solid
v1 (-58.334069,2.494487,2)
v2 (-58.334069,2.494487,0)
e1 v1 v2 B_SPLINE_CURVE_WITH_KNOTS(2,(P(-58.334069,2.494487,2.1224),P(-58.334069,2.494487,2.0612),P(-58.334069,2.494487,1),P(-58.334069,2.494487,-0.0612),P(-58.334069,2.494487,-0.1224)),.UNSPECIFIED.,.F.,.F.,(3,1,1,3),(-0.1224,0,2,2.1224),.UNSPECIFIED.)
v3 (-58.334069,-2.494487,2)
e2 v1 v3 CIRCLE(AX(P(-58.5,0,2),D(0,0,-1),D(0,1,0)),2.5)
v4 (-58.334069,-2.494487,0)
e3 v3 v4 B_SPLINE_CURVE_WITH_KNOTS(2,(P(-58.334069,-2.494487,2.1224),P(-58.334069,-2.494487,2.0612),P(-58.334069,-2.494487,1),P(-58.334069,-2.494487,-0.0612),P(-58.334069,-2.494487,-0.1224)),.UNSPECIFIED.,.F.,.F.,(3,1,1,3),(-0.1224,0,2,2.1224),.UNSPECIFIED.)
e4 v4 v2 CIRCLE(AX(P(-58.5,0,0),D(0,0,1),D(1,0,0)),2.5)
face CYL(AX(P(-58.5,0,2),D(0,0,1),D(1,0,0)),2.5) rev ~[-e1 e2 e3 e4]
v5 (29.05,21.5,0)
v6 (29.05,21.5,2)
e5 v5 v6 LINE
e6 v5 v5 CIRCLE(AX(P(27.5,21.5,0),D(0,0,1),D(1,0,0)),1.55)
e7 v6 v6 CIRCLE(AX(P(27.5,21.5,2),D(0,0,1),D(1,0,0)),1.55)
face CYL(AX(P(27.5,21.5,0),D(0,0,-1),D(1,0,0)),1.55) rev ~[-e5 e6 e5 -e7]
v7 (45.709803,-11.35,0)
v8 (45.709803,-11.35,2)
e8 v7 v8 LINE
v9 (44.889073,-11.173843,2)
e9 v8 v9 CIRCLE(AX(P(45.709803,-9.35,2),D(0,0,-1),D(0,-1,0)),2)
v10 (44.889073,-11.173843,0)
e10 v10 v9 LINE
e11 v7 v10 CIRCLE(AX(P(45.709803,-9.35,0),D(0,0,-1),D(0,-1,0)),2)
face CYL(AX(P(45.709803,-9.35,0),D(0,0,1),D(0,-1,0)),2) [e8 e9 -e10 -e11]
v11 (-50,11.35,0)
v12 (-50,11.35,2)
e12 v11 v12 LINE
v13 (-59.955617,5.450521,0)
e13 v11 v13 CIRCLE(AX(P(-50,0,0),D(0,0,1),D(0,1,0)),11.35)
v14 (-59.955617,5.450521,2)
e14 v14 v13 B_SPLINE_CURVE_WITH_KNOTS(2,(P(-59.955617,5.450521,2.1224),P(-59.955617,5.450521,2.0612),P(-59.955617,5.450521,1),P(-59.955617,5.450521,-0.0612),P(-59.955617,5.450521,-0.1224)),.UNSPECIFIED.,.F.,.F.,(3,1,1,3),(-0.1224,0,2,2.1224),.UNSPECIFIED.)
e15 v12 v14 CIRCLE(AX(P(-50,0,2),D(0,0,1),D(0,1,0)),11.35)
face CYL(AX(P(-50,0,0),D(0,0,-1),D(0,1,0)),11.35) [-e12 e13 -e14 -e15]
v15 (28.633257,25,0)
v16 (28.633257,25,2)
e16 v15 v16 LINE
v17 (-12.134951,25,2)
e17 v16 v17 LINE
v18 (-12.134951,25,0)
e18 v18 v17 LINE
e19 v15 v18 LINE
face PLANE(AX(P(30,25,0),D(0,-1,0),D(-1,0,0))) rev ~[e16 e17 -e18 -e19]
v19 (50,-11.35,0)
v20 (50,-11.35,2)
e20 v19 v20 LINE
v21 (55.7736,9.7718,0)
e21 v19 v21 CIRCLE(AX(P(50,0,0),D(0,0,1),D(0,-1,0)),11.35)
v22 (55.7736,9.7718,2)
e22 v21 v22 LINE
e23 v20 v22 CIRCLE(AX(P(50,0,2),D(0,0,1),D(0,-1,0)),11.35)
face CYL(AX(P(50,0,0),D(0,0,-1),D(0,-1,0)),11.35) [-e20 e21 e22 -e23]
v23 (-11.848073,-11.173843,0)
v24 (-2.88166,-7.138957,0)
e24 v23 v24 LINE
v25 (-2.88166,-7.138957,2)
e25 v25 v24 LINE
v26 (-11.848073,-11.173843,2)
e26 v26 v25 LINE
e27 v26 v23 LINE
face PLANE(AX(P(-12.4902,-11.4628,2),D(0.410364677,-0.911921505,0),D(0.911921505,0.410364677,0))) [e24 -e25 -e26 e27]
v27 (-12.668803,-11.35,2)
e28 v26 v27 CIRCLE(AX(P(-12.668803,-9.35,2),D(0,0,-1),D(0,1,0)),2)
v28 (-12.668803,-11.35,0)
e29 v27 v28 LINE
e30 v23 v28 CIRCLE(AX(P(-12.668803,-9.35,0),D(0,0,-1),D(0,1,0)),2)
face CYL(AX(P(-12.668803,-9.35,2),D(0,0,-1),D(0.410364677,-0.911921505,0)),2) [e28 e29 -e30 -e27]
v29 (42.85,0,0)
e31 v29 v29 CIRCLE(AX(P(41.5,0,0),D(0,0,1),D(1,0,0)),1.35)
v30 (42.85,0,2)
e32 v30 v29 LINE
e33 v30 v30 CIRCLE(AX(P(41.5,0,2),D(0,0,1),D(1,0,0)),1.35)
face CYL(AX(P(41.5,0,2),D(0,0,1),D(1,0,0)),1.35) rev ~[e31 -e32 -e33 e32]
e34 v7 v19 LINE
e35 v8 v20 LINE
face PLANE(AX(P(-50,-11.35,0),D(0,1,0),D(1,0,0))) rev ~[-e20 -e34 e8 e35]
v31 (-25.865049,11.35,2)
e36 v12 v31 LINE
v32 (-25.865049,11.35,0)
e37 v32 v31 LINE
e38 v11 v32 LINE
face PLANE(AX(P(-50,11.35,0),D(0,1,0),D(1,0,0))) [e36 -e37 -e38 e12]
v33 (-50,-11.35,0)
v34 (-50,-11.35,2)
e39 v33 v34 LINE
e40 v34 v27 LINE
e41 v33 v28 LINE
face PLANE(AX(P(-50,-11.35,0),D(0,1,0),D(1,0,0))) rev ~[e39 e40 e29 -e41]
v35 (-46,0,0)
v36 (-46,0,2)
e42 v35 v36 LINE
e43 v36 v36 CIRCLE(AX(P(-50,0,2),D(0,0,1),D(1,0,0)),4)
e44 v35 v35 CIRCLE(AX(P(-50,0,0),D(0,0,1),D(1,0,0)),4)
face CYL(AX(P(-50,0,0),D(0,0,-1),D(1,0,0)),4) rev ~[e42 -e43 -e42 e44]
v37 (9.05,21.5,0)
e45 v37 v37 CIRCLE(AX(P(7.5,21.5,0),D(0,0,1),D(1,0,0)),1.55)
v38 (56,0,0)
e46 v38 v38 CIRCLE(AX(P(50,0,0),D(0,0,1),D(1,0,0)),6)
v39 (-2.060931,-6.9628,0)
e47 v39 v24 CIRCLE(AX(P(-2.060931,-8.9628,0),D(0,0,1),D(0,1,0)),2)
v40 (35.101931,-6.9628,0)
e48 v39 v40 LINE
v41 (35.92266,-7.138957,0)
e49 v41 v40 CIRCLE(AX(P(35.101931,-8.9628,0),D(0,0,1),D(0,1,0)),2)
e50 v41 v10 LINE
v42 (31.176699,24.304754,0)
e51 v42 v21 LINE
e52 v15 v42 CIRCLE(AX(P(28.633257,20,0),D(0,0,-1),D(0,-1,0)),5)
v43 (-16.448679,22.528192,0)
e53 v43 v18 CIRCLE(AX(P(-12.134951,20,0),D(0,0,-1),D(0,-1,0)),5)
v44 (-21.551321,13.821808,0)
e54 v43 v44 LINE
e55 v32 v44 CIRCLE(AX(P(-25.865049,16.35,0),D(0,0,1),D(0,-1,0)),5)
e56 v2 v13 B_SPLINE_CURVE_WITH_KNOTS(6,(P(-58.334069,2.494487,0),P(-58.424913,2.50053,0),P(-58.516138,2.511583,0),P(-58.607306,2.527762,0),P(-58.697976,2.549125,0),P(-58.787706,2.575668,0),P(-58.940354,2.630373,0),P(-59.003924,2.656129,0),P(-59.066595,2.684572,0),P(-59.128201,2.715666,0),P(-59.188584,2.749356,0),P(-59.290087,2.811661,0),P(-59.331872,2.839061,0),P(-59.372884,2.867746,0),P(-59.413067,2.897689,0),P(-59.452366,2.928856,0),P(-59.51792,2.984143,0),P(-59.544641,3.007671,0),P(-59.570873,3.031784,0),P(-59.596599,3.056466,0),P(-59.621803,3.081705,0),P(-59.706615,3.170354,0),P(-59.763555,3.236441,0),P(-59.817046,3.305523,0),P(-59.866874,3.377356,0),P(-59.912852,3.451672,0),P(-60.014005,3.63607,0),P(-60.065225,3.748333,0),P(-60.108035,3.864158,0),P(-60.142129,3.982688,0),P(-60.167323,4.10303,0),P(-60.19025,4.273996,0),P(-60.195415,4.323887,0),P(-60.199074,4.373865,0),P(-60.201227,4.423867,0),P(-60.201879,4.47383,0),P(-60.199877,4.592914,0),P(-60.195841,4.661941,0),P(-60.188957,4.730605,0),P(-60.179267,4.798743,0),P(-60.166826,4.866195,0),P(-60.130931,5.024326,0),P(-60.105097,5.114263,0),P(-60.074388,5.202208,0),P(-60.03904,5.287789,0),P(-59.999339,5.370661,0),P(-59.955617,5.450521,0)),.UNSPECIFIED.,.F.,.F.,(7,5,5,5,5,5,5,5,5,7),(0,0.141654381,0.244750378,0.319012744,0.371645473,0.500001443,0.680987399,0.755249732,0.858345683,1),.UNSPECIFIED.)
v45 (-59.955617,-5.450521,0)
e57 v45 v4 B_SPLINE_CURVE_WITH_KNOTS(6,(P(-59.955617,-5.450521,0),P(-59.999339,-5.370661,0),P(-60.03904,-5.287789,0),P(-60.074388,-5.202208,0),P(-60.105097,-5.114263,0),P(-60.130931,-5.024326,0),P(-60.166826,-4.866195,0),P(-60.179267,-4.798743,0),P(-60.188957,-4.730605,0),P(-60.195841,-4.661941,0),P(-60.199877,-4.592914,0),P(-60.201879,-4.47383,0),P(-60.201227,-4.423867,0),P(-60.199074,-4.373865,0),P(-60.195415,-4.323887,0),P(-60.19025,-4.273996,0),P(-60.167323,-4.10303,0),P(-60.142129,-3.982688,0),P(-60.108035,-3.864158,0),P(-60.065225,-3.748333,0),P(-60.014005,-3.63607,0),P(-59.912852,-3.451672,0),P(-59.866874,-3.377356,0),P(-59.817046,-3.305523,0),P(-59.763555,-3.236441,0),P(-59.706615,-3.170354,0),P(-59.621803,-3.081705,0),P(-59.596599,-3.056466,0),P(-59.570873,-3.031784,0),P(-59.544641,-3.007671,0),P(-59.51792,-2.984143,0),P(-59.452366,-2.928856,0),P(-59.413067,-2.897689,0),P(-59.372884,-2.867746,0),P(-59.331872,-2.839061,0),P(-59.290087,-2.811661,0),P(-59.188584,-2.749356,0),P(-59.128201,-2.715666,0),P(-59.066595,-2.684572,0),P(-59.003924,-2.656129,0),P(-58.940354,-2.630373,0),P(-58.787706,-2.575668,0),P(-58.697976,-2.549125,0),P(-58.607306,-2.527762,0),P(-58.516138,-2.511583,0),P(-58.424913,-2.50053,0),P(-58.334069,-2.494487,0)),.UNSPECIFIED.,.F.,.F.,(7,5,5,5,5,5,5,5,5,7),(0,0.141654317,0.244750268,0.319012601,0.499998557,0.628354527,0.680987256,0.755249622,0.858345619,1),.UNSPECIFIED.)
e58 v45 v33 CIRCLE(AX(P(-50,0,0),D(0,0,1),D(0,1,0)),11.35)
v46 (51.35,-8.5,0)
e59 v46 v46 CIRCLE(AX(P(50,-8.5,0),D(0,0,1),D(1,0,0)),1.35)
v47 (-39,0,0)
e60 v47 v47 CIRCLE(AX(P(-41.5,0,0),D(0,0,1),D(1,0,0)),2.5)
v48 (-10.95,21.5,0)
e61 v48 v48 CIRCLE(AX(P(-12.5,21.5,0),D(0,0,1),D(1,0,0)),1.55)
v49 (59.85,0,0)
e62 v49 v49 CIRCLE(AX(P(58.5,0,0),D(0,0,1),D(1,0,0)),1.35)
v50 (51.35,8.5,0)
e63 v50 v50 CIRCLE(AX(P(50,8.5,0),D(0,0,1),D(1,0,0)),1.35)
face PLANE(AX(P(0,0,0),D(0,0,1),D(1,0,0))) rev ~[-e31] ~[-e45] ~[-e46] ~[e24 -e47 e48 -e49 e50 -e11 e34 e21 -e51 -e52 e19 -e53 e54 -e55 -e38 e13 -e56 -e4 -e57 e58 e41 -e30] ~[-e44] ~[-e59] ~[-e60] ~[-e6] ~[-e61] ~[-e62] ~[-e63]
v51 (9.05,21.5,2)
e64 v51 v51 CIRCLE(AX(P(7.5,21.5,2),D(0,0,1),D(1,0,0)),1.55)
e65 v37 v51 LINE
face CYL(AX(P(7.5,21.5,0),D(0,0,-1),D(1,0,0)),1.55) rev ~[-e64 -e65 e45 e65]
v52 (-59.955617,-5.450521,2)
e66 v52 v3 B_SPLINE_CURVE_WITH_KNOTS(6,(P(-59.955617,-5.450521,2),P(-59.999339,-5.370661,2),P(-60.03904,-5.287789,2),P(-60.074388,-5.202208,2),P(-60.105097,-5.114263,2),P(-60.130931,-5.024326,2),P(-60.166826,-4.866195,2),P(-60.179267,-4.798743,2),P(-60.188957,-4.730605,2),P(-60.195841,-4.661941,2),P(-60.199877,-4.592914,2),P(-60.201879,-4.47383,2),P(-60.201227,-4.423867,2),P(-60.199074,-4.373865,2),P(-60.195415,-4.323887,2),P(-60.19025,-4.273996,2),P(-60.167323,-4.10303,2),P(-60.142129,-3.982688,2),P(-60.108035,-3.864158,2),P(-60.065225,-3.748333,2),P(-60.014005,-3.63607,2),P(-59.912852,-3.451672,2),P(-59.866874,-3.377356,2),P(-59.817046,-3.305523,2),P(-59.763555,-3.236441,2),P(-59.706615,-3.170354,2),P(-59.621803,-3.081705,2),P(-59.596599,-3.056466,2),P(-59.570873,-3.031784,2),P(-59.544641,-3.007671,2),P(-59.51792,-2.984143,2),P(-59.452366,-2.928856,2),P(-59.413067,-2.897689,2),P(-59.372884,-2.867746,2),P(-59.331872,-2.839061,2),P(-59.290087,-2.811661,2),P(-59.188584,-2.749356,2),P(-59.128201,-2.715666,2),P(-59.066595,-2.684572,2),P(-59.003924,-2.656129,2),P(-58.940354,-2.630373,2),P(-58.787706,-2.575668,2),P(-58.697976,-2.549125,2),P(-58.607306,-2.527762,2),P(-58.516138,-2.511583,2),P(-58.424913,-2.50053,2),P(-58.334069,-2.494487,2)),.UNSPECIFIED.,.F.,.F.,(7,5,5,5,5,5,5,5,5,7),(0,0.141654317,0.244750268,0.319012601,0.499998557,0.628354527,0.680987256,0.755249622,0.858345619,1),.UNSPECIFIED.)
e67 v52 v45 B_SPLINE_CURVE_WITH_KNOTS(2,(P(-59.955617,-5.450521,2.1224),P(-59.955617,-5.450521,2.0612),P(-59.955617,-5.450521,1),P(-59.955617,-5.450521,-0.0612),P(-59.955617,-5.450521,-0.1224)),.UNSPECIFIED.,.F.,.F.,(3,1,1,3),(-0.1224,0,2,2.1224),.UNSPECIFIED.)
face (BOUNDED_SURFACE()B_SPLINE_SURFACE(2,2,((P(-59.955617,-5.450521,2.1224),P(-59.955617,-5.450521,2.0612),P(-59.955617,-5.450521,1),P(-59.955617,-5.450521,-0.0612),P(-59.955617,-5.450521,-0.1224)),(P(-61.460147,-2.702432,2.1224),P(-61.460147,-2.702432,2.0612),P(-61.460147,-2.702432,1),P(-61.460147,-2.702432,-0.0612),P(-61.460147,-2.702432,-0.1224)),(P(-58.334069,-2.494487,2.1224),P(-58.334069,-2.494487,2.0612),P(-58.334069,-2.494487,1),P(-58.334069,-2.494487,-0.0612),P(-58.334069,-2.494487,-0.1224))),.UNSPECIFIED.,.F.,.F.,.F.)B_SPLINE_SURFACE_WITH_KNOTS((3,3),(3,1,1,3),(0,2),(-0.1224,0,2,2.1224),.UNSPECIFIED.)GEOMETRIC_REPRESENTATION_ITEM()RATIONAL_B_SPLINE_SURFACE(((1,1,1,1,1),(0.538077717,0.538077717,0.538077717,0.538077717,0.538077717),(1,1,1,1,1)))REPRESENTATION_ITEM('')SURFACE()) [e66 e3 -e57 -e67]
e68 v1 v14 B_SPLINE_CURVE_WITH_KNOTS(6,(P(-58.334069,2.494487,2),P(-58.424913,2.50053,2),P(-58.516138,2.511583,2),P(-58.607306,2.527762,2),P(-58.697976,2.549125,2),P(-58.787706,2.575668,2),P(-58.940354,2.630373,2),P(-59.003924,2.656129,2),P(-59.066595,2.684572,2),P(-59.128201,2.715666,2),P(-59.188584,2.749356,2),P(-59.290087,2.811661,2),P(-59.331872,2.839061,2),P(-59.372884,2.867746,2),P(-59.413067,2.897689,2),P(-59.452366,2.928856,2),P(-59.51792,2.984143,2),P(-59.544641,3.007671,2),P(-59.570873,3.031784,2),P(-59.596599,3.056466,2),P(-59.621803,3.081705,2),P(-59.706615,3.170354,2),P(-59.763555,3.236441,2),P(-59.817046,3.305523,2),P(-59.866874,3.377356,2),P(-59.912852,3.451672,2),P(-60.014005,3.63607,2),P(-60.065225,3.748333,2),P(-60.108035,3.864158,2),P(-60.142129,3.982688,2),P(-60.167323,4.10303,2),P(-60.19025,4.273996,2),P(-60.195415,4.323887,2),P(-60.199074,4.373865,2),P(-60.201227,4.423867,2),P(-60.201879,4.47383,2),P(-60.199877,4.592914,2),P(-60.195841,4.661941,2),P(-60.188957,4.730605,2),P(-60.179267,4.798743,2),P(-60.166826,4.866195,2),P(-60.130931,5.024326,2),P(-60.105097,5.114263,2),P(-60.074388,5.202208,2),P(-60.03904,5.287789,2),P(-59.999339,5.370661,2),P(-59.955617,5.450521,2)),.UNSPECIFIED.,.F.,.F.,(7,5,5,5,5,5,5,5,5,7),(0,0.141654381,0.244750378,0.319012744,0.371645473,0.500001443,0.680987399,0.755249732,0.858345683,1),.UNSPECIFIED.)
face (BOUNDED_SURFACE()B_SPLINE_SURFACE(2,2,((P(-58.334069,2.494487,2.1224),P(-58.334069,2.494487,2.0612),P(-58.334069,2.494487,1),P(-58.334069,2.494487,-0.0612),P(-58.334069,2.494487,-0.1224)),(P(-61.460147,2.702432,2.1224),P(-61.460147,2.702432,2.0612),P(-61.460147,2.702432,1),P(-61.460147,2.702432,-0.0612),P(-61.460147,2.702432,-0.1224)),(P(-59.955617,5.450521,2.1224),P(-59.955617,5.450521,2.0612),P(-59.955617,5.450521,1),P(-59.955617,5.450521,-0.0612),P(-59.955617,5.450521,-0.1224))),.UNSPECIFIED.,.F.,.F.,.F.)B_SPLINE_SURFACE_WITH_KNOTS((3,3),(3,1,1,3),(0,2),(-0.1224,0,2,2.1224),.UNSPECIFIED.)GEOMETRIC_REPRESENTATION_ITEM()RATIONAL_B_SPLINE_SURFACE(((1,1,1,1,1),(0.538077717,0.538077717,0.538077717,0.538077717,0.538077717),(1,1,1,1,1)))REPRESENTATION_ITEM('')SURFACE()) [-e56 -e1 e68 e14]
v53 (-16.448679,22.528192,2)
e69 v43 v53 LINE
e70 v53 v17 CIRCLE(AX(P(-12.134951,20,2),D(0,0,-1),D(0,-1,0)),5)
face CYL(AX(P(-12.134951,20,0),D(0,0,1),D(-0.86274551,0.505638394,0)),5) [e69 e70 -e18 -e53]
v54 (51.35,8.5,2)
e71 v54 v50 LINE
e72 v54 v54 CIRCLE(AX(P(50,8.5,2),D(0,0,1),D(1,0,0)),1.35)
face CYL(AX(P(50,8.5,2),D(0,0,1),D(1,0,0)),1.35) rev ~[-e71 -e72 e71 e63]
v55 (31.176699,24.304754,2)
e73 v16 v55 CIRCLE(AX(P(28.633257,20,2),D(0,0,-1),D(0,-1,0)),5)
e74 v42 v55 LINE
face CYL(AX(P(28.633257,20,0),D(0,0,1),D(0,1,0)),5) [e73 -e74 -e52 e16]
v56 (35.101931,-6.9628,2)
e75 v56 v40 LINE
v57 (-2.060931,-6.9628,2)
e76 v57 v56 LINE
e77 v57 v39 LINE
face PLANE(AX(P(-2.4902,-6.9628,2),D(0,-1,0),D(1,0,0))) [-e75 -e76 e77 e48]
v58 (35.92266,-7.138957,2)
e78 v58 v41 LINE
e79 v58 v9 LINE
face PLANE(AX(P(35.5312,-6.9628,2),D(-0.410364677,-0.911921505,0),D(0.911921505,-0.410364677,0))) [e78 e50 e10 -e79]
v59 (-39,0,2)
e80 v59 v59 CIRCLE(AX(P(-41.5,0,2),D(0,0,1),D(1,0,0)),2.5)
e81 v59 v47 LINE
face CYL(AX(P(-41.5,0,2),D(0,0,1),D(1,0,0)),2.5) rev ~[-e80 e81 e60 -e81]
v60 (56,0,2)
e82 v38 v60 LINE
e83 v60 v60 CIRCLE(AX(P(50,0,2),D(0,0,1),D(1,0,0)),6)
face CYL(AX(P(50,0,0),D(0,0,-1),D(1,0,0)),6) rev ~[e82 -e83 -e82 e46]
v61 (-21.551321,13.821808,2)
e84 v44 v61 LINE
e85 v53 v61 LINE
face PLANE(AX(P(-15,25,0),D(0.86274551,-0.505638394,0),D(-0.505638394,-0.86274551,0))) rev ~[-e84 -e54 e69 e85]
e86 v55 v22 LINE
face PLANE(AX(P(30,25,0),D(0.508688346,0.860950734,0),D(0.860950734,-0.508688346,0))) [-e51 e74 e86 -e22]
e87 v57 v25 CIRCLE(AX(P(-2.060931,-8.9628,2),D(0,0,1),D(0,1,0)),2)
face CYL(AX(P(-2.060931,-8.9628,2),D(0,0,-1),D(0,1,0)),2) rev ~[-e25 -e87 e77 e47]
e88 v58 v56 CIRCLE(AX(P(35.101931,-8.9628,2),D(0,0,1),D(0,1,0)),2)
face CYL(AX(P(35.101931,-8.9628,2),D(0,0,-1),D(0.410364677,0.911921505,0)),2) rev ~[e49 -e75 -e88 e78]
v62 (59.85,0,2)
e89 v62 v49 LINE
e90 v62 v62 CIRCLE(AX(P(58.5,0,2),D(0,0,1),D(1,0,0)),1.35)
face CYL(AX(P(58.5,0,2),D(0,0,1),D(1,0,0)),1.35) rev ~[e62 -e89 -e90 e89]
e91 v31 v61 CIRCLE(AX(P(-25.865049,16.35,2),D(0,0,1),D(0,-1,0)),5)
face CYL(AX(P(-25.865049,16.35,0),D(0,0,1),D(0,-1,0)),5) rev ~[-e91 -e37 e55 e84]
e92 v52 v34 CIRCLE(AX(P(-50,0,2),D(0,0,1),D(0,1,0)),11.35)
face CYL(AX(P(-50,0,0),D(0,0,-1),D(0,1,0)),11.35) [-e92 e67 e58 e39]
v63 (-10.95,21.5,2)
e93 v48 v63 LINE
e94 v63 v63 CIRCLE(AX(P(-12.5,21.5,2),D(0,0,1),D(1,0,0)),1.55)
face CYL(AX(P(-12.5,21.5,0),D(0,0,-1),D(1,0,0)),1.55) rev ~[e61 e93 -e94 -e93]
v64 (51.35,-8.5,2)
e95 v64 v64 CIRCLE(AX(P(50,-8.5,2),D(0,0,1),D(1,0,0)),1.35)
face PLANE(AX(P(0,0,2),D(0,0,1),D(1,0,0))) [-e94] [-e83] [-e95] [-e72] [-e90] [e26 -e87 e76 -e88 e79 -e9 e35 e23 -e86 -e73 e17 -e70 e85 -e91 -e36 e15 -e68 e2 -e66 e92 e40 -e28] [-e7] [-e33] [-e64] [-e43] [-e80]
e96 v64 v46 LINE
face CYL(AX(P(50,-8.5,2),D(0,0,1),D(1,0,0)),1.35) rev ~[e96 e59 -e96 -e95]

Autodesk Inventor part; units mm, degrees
ref_plane "YZ Plane" through (0, 0, 0) normal (1, 0, 0) x (0, 1, 0)
ref_plane "XZ Plane" through (0, 0, 0) normal (0, 1, 0) x (-1, 0, 0)
ref_plane "XY Plane" through (0, 0, 0) normal (0, 0, 1) x (1, 0, 0)
sketch "スケッチ1" plane through (0, 0, 0) normal (0, 0, 1) x (1, 0, 0)
  line L0 (-50, 0) -> (50, 0) construction
  circle A0 centre (-50, 0) radius 4
  circle A1 centre (50, 0) radius 6
  line L1 (-50, 11.35) -> (-23, 11.35)
  line L2 (-50, -11.35) -> (50, -11.35)
  arc A2 (50, -11.35) -> (50, 11.35) centre (50, 0) ccw
  line L3 (30, 25) -> (-15, 25)
  line L4 (-15, 25) -> (-23, 11.35)
  line L5 (-19.1026, 18) -> (41.8474, 18) construction
  line L6 (-15, 25) -> (-15, 18) construction
  line L7 (30, 25) -> (30, 18) construction
  circle A3 centre (27.5, 21.5) radius 1.55
  circle A4 centre (-12.5, 21.5) radius 1.55
  circle A5 centre (7.5, 21.5) radius 1.55
  line L8 (-15, 21.5) -> (30, 21.5) construction
  line L9 (30, 24) -> (-15, 24) construction
  line L10 (-15, 24) -> (-15, 19) construction
  line L11 (-15, 19) -> (30, 19) construction
  line L12 (30, 19) -> (30, 24) construction
  line L13 (-23, 11.35) -> (50, 11.35)
  arc A6 (-50, 11.35) -> (-50, -11.35) centre (-50, 0) ccw
  line L14 (7.5, 25) -> (7.5, 18.5172) construction
  line L15 (30, 25) -> (55.7736, 9.7718)
  point P0 (0, 0)
  point P1 (0, 0)
  point P2 (55.7736, 9.7718)
  point P3 (38, 11.35)
  dimension "d0" = 100
  dimension "d1" = 8
  dimension "d8" = 12
  dimension "d10" = 7
  dimension "d11" = 45
  dimension "d12" = 2.5
  dimension "d13" = 3.1
  dimension "d14" = 2.5
  dimension "d15" = 20
  dimension "d17" = 5
  dimension "d18" = 19
  dimension "d69" = 11.35
  dimension "d72" = 11.35
  dimension "d87" = 8
  dimension "d88" = 8
extrude "押し出し1" add sketch "スケッチ1" along normal blind 2
fillet "フィレット1" radius 5 4 edges at (-23, 11.35, 1) (-15, 25, 1) (30, 25, 1) (-50, 11.35, 1)
sketch "スケッチ2" plane through (0, 0, 2) normal (0, 0, 1) x (1, 0, 0)
  arc A0 (50, -11.35) -> (55.7736, 9.7718) centre (50, 0) ccw projected
  line L0 (18, -20) -> (-35.4549, -20) construction
  line L1 (-76.9372, -11.5) -> (-72, -11.5)
  line L2 (-76.9372, -12.4) -> (-76.9372, -11.5)
  line L3 (-71.9872, -11.45) -> (-76.9872, -11.45)
  line L4 (-76.9872, -11.45) -> (-76.9872, -12.45)
  circle A1 centre (-50, 0) radius 4 projected
  circle A2 centre (-50, 0) radius 5.5 construction
  circle A3 centre (50, 0) radius 6 projected
  line L5 (83.3205, -17.7128) -> (50, 0) construction
  line L6 (50, 0) -> (18, -20) construction
  line L7 (83.3205, -17.7128) -> (37.8533, -17.7128) construction
  line L8 (-13.4166, -12.4128) -> (46.4577, -12.4128)
  line L9 (46.4577, -12.4128) -> (46.4577, -11.5128)
  line L10 (46.4577, -11.5128) -> (45.5205, -11.5128)
  line L11 (45.5205, -11.5128) -> (35.5205, -7.0128)
  line L12 (35.5205, -7.0128) -> (-2.4795, -7.0128)
  line L13 (-2.4795, -7.0128) -> (-12.4795, -11.5128)
  line L14 (-12.4795, -11.5128) -> (-13.4166, -11.5128)
  line L15 (-13.4166, -11.5128) -> (-13.4166, -12.4128)
  line L16 (-12.4902, -11.4628) -> (-2.4902, -6.9628)
  line L17 (-2.4902, -6.9628) -> (35.5312, -6.9628)
  line L18 (35.5312, -6.9628) -> (45.5312, -11.4628)
  line L19 (45.5312, -11.4628) -> (46.5077, -11.4628)
  line L20 (46.5077, -11.4628) -> (46.5077, -12.4628)
  line L21 (46.5077, -12.4628) -> (-13.4666, -12.4628)
  line L22 (-13.4666, -12.4628) -> (-13.4666, -11.4628)
  line L23 (-13.4666, -11.4628) -> (-12.4902, -11.4628)
  point P0 (56.6914, 9.1677)
  point P1 (0, 0)
  point P2 (50, 11.35)
  dimension "d19" = 20
  dimension "d20" = 32
  dimension "d32" = 11
  dimension "d33" = 120
  dimension "d37" = 37.8
  dimension "d38" = 6.2
  dimension "d39" = 0.05
  dimension "d49" = 38
  dimension "d50" = 10
  dimension "d51" = 10
  dimension "d52" = 4.5
  dimension "d53" = 0.9
  dimension "d54" = 59.9743
extrude "押し出し2" cut sketch "スケッチ2" against normal blind 10 contours L15 L14 L13 L12 L11 L10 L9 L8 | L16 L17 L18 L19 L20 L21 L22 L23
fillet "フィレット2" radius 2 4 edges at (45.2805, -11.35, 1) (-12.2395, -11.35, 1) (35.5312, -6.9628, 1) (-2.4902, -6.9628, 1)
sketch "スケッチ4" plane through (0, 0, 2) normal (0, 0, 1) x (1, 0, 0)
  circle A0 centre (50, 0) radius 6 projected
  circle A1 centre (50, 0) radius 8.5 construction
  line L0 (50, 0) -> (50, 8.5) construction
  circle A2 centre (50, 8.5) radius 1.35
  circle A3 centre (41.5, 0) radius 1.35
  circle A4 centre (50, -8.5) radius 1.35
  circle A5 centre (58.5, 0) radius 1.35
  point P0 (0, 0)
  dimension "d61" = 17
  dimension "d62" = 2.7
  dimension "d65" = 360
extrude "押し出し4" cut sketch "スケッチ4" against normal through all contours A2 | A3 | A4 | A5
sketch "スケッチ6" plane through (0, 0, 2) normal (0, 0, 1) x (1, 0, 0)
  circle A0 centre (-50, 0) radius 4 projected
  circle A1 centre (-50, 0) radius 8.5 construction
  circle A2 centre (-58.5, 0) radius 2.5
  line L0 (-50, 0) -> (-58.5, 0) construction
  line L1 (-50, 0) -> (-41.5, 0) construction
  circle A3 centre (-41.5, 0) radius 2.5
  arc A4 (-50, 11.35) -> (-50, -11.35) centre (-50, 0) ccw projected
  line L2 (-58.5, -2.5) -> (-61.0712, -2.5)
  line L3 (-58.5, 2.5) -> (-61.0712, 2.5)
  point P0 (0, 0)
  dimension "d78" = 17
  dimension "d79" = 5
  dimension "d82" = 360
extrude "押し出し6" cut sketch "スケッチ6" against normal through all contours A2 | A2 L2 A4 L3 | A3
fillet "フィレット4" radius 2 2 edges at (-61.0712, 2.5, 1) (-61.0712, -2.5, 1)
equation "\"d14\" = d12"
properties part number "リンク_メインフレーム_6_4" material "GFRP"
